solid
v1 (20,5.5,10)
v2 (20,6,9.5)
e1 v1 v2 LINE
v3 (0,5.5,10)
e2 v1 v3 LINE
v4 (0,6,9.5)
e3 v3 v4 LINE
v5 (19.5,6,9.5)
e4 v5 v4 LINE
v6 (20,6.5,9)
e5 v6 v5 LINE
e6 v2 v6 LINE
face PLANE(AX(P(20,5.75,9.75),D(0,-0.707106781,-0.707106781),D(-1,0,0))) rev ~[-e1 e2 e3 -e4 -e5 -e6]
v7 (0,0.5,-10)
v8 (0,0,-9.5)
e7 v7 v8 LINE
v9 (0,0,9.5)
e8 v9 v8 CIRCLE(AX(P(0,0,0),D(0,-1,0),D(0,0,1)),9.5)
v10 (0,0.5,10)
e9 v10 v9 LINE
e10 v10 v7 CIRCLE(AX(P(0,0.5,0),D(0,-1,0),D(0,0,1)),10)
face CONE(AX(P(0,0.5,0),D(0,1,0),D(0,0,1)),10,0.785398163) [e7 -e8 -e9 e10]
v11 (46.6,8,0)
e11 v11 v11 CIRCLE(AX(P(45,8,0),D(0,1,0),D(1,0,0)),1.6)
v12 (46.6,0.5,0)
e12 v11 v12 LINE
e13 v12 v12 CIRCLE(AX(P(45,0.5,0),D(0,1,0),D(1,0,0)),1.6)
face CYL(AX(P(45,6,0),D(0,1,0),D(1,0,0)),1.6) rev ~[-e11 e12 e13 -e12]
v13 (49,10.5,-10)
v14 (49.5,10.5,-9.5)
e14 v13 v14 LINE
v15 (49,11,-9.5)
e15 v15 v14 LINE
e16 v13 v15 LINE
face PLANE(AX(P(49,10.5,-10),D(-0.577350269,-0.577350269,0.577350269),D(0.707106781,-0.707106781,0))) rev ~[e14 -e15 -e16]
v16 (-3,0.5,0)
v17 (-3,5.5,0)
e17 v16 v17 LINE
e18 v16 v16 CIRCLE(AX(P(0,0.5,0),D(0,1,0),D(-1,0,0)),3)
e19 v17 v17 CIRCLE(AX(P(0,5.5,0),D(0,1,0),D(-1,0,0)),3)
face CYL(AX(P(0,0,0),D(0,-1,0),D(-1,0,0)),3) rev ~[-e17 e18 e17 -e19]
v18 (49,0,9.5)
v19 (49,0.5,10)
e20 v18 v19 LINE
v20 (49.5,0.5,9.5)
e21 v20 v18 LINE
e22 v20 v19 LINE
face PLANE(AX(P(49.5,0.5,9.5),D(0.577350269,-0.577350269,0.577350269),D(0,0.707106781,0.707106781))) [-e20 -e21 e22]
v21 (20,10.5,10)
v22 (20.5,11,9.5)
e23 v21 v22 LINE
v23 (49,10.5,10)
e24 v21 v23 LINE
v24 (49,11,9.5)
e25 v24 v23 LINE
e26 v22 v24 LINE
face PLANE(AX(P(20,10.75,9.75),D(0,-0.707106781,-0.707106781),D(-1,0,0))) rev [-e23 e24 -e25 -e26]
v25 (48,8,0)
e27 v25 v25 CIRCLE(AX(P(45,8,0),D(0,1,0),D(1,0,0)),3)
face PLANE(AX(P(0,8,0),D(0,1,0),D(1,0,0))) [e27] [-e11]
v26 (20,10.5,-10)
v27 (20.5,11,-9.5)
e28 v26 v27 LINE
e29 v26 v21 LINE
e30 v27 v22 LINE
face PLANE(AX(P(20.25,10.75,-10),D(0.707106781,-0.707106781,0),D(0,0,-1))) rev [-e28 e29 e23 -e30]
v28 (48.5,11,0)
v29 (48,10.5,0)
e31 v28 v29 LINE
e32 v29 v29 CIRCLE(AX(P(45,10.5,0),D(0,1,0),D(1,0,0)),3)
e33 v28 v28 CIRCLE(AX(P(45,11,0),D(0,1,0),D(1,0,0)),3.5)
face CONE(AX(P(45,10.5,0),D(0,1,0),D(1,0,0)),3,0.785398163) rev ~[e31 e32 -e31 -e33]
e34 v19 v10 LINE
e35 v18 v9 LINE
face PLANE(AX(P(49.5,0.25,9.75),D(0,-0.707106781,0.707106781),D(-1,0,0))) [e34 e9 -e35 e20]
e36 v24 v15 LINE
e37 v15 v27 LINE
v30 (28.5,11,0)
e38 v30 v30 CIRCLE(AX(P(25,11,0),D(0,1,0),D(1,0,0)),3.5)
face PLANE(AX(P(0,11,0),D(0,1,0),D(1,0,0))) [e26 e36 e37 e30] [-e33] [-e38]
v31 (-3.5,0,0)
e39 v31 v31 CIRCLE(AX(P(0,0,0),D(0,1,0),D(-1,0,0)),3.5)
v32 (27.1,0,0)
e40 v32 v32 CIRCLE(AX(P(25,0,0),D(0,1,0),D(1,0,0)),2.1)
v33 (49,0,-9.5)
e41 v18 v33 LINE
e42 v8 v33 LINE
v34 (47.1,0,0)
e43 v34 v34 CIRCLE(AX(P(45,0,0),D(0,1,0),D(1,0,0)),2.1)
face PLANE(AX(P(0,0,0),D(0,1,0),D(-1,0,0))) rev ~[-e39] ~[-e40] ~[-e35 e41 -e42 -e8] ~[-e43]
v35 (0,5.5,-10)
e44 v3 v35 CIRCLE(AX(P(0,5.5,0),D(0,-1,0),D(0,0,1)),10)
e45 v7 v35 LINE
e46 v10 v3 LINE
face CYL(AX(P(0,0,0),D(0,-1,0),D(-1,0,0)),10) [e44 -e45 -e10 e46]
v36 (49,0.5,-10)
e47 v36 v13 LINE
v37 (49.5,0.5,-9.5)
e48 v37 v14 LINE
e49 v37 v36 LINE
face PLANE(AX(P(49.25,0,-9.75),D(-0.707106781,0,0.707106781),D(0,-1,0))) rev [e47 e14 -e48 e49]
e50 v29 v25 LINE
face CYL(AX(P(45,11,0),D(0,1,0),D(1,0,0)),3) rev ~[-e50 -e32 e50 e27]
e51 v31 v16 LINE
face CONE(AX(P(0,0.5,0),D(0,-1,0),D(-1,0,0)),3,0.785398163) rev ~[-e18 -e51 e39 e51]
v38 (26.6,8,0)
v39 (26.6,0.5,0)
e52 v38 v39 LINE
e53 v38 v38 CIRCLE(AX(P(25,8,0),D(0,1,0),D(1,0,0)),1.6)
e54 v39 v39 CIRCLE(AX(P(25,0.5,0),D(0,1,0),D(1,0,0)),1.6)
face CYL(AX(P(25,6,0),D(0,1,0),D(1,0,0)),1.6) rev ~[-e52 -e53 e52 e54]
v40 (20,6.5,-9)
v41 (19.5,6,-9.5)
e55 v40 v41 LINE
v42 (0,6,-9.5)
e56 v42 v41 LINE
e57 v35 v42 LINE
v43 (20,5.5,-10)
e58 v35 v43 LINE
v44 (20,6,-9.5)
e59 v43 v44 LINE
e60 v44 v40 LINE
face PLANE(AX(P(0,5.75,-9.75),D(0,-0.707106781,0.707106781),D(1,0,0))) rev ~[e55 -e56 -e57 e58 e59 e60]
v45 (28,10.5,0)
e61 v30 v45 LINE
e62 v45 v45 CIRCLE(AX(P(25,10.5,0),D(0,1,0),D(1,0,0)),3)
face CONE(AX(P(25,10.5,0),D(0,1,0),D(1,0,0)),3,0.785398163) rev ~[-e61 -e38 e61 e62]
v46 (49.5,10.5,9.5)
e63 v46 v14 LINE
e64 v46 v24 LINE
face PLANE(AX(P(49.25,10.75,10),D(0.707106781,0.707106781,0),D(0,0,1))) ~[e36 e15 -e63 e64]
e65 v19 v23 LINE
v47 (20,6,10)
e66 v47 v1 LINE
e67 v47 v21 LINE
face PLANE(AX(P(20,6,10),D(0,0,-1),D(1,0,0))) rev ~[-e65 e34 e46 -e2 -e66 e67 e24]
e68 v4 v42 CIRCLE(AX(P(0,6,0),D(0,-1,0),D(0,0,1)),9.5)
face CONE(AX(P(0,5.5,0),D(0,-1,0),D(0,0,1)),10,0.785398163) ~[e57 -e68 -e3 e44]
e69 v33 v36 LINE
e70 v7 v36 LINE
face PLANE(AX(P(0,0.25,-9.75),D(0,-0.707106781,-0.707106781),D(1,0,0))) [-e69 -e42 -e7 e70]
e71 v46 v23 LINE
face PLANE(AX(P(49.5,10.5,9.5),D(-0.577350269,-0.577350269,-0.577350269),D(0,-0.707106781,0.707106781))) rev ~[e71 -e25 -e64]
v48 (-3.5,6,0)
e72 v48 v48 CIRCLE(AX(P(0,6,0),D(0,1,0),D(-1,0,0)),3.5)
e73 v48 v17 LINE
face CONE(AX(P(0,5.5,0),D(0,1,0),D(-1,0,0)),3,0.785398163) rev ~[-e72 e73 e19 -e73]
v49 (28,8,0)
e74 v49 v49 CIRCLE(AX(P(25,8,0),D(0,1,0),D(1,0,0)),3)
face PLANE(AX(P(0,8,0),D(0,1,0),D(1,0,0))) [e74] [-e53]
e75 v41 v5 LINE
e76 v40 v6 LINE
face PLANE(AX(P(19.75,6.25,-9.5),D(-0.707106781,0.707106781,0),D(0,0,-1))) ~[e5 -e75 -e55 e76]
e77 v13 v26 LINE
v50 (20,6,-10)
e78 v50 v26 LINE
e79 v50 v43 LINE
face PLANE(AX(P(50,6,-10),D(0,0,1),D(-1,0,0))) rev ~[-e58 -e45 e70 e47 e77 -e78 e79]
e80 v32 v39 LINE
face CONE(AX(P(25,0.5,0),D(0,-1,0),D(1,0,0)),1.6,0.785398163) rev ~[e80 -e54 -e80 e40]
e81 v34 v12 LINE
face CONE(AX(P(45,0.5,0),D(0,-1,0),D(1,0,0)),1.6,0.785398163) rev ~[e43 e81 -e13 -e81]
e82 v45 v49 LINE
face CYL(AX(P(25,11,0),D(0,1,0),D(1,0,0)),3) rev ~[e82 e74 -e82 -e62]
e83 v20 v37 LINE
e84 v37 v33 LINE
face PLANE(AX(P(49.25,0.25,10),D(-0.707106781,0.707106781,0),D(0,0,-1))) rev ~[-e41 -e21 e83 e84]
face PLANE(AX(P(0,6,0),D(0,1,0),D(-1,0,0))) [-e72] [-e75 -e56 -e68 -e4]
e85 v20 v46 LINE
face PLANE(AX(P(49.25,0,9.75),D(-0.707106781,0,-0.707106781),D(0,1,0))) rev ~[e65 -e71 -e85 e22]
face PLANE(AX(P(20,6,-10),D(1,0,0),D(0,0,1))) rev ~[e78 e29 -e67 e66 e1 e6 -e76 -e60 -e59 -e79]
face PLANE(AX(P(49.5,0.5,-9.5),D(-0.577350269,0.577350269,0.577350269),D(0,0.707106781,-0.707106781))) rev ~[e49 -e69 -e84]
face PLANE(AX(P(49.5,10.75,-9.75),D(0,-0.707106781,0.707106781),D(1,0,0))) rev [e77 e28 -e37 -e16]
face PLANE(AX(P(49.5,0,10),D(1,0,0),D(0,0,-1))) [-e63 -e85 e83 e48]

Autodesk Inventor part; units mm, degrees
ref_plane "YZ Plane" through (0, 0, 0) normal (1, 0, 0) x (0, 1, 0)
ref_plane "XZ Plane" through (0, 0, 0) normal (0, 1, 0) x (-1, 0, 0)
ref_plane "XY Plane" through (0, 0, 0) normal (0, 0, 1) x (1, 0, 0)
sketch "Náčrt1" plane through (0, 0, 0) normal (0, 1, 0) x (-1, 0, 0)
  circle A0 centre (0, 0) radius 10
  line L0 (0, -10) -> (-50, -10)
  line L1 (-50, -10) -> (-50, 10)
  line L2 (-50, 10) -> (0, 10)
  circle A1 centre (0, 0) radius 3
  circle A2 centre (0, 0) radius 7.5 construction
  dimension "d0" = 6
  dimension "d1" = 15
  dimension "d2" = 20
  dimension "d3" = 50
extrude "Vysunutí1" add sketch "Náčrt1" along normal blind 6
sketch "Náčrt2" plane through (0, 6, 0) normal (0, 1, 0) x (1, 0, 0)
  line L0 (0, -10) -> (50, -10) projected
  line L1 (50, -10) -> (50, 10) projected
  line L2 (50, 10) -> (0, 10) projected
  arc A0 (0, 10) -> (0, -10) centre (0, 0) ccw projected
  circle A1 centre (0, 0) radius 3 projected
  circle A2 centre (45, 0) radius 1.6
  circle A3 centre (25, 0) radius 1.6
  dimension "d6" = 5
  dimension "d7" = 25
  dimension "d8" = 3.2
extrude "Vysunutí2" cut sketch "Náčrt2" against normal through all contours A2 | A3
sketch "Náčrt5" plane through (0, 6, 0) normal (0, 1, 0) x (1, 0, 0)
  circle A0 centre (45, 0) radius 1.6 projected
  circle A1 centre (25, 0) radius 1.6 projected
  line L0 (0, -10) -> (50, -10) projected
  line L1 (50, -10) -> (50, 10) projected
  line L2 (50, 10) -> (0, 10) projected
  arc A2 (0, 10) -> (0, -10) centre (0, 0) ccw projected
  circle A3 centre (0, 0) radius 3 projected
  line L3 (20, 10) -> (20, -10)
  dimension "d19" = 30
extrude "Vysunutí5" add sketch "Náčrt5" along normal blind 5 contours L3 L2 L1 L0
sketch "Náčrt7" plane through (0, 11, 0) normal (0, 1, 0) x (1, 0, 0)
  line L0 (50, 10) -> (20, 10) projected
  line L1 (20, 10) -> (20, -10) projected
  line L2 (20, -10) -> (50, -10) projected
  line L3 (50, -10) -> (50, 10) projected
  circle A0 centre (25, 0) radius 1.6 projected
  circle A1 centre (45, 0) radius 1.6 projected
  circle A2 centre (25, 0) radius 1.6 projected
  circle A3 centre (25, 0) radius 3
  circle A4 centre (45, 0) radius 1.6 projected
  circle A5 centre (45, 0) radius 3
  point P0 (0, 0)
  dimension "d22" = 6
extrude "Vysunutí6" cut sketch "Náčrt7" against normal blind 3 contours A3 | A5
sketch "Náčrt8" plane through (50, 0, 10) normal (1, 0, 0) x (0, 0, -1)
  line L0 (0, 0) -> (20, 0) projected
  line L1 (20, 0) -> (20, 11) projected
  line L2 (0, 11) -> (20, 11) projected
  line L3 (0, 0) -> (0, 11) projected
  point P0 (10, 0)
extrude "Vysunutí7" cut sketch "Náčrt8" against normal blind 0.5
chamfer "Zkosení2" distance 0.5 angle 45 20 edges at (20, 11, 0) (22, 11, 0) (42, 11, 0) (24.75, 0, 10) (-10, 0, 0) (24.75, 0, -10) (10, 6, 10) (-10, 6, 0) (10, 6, -10) (34.75, 11, 10) (49.5, 11, 0) (34.75, 11, -10) (49.5, 0, 0) (49.5, 5.5, 10) (49.5, 5.5, -10) (3, 6, 0) (20, 6, 0) (3, 0, 0) (23.4, 0, 0) (43.4, 0, 0)
properties part number "middle_joint"
